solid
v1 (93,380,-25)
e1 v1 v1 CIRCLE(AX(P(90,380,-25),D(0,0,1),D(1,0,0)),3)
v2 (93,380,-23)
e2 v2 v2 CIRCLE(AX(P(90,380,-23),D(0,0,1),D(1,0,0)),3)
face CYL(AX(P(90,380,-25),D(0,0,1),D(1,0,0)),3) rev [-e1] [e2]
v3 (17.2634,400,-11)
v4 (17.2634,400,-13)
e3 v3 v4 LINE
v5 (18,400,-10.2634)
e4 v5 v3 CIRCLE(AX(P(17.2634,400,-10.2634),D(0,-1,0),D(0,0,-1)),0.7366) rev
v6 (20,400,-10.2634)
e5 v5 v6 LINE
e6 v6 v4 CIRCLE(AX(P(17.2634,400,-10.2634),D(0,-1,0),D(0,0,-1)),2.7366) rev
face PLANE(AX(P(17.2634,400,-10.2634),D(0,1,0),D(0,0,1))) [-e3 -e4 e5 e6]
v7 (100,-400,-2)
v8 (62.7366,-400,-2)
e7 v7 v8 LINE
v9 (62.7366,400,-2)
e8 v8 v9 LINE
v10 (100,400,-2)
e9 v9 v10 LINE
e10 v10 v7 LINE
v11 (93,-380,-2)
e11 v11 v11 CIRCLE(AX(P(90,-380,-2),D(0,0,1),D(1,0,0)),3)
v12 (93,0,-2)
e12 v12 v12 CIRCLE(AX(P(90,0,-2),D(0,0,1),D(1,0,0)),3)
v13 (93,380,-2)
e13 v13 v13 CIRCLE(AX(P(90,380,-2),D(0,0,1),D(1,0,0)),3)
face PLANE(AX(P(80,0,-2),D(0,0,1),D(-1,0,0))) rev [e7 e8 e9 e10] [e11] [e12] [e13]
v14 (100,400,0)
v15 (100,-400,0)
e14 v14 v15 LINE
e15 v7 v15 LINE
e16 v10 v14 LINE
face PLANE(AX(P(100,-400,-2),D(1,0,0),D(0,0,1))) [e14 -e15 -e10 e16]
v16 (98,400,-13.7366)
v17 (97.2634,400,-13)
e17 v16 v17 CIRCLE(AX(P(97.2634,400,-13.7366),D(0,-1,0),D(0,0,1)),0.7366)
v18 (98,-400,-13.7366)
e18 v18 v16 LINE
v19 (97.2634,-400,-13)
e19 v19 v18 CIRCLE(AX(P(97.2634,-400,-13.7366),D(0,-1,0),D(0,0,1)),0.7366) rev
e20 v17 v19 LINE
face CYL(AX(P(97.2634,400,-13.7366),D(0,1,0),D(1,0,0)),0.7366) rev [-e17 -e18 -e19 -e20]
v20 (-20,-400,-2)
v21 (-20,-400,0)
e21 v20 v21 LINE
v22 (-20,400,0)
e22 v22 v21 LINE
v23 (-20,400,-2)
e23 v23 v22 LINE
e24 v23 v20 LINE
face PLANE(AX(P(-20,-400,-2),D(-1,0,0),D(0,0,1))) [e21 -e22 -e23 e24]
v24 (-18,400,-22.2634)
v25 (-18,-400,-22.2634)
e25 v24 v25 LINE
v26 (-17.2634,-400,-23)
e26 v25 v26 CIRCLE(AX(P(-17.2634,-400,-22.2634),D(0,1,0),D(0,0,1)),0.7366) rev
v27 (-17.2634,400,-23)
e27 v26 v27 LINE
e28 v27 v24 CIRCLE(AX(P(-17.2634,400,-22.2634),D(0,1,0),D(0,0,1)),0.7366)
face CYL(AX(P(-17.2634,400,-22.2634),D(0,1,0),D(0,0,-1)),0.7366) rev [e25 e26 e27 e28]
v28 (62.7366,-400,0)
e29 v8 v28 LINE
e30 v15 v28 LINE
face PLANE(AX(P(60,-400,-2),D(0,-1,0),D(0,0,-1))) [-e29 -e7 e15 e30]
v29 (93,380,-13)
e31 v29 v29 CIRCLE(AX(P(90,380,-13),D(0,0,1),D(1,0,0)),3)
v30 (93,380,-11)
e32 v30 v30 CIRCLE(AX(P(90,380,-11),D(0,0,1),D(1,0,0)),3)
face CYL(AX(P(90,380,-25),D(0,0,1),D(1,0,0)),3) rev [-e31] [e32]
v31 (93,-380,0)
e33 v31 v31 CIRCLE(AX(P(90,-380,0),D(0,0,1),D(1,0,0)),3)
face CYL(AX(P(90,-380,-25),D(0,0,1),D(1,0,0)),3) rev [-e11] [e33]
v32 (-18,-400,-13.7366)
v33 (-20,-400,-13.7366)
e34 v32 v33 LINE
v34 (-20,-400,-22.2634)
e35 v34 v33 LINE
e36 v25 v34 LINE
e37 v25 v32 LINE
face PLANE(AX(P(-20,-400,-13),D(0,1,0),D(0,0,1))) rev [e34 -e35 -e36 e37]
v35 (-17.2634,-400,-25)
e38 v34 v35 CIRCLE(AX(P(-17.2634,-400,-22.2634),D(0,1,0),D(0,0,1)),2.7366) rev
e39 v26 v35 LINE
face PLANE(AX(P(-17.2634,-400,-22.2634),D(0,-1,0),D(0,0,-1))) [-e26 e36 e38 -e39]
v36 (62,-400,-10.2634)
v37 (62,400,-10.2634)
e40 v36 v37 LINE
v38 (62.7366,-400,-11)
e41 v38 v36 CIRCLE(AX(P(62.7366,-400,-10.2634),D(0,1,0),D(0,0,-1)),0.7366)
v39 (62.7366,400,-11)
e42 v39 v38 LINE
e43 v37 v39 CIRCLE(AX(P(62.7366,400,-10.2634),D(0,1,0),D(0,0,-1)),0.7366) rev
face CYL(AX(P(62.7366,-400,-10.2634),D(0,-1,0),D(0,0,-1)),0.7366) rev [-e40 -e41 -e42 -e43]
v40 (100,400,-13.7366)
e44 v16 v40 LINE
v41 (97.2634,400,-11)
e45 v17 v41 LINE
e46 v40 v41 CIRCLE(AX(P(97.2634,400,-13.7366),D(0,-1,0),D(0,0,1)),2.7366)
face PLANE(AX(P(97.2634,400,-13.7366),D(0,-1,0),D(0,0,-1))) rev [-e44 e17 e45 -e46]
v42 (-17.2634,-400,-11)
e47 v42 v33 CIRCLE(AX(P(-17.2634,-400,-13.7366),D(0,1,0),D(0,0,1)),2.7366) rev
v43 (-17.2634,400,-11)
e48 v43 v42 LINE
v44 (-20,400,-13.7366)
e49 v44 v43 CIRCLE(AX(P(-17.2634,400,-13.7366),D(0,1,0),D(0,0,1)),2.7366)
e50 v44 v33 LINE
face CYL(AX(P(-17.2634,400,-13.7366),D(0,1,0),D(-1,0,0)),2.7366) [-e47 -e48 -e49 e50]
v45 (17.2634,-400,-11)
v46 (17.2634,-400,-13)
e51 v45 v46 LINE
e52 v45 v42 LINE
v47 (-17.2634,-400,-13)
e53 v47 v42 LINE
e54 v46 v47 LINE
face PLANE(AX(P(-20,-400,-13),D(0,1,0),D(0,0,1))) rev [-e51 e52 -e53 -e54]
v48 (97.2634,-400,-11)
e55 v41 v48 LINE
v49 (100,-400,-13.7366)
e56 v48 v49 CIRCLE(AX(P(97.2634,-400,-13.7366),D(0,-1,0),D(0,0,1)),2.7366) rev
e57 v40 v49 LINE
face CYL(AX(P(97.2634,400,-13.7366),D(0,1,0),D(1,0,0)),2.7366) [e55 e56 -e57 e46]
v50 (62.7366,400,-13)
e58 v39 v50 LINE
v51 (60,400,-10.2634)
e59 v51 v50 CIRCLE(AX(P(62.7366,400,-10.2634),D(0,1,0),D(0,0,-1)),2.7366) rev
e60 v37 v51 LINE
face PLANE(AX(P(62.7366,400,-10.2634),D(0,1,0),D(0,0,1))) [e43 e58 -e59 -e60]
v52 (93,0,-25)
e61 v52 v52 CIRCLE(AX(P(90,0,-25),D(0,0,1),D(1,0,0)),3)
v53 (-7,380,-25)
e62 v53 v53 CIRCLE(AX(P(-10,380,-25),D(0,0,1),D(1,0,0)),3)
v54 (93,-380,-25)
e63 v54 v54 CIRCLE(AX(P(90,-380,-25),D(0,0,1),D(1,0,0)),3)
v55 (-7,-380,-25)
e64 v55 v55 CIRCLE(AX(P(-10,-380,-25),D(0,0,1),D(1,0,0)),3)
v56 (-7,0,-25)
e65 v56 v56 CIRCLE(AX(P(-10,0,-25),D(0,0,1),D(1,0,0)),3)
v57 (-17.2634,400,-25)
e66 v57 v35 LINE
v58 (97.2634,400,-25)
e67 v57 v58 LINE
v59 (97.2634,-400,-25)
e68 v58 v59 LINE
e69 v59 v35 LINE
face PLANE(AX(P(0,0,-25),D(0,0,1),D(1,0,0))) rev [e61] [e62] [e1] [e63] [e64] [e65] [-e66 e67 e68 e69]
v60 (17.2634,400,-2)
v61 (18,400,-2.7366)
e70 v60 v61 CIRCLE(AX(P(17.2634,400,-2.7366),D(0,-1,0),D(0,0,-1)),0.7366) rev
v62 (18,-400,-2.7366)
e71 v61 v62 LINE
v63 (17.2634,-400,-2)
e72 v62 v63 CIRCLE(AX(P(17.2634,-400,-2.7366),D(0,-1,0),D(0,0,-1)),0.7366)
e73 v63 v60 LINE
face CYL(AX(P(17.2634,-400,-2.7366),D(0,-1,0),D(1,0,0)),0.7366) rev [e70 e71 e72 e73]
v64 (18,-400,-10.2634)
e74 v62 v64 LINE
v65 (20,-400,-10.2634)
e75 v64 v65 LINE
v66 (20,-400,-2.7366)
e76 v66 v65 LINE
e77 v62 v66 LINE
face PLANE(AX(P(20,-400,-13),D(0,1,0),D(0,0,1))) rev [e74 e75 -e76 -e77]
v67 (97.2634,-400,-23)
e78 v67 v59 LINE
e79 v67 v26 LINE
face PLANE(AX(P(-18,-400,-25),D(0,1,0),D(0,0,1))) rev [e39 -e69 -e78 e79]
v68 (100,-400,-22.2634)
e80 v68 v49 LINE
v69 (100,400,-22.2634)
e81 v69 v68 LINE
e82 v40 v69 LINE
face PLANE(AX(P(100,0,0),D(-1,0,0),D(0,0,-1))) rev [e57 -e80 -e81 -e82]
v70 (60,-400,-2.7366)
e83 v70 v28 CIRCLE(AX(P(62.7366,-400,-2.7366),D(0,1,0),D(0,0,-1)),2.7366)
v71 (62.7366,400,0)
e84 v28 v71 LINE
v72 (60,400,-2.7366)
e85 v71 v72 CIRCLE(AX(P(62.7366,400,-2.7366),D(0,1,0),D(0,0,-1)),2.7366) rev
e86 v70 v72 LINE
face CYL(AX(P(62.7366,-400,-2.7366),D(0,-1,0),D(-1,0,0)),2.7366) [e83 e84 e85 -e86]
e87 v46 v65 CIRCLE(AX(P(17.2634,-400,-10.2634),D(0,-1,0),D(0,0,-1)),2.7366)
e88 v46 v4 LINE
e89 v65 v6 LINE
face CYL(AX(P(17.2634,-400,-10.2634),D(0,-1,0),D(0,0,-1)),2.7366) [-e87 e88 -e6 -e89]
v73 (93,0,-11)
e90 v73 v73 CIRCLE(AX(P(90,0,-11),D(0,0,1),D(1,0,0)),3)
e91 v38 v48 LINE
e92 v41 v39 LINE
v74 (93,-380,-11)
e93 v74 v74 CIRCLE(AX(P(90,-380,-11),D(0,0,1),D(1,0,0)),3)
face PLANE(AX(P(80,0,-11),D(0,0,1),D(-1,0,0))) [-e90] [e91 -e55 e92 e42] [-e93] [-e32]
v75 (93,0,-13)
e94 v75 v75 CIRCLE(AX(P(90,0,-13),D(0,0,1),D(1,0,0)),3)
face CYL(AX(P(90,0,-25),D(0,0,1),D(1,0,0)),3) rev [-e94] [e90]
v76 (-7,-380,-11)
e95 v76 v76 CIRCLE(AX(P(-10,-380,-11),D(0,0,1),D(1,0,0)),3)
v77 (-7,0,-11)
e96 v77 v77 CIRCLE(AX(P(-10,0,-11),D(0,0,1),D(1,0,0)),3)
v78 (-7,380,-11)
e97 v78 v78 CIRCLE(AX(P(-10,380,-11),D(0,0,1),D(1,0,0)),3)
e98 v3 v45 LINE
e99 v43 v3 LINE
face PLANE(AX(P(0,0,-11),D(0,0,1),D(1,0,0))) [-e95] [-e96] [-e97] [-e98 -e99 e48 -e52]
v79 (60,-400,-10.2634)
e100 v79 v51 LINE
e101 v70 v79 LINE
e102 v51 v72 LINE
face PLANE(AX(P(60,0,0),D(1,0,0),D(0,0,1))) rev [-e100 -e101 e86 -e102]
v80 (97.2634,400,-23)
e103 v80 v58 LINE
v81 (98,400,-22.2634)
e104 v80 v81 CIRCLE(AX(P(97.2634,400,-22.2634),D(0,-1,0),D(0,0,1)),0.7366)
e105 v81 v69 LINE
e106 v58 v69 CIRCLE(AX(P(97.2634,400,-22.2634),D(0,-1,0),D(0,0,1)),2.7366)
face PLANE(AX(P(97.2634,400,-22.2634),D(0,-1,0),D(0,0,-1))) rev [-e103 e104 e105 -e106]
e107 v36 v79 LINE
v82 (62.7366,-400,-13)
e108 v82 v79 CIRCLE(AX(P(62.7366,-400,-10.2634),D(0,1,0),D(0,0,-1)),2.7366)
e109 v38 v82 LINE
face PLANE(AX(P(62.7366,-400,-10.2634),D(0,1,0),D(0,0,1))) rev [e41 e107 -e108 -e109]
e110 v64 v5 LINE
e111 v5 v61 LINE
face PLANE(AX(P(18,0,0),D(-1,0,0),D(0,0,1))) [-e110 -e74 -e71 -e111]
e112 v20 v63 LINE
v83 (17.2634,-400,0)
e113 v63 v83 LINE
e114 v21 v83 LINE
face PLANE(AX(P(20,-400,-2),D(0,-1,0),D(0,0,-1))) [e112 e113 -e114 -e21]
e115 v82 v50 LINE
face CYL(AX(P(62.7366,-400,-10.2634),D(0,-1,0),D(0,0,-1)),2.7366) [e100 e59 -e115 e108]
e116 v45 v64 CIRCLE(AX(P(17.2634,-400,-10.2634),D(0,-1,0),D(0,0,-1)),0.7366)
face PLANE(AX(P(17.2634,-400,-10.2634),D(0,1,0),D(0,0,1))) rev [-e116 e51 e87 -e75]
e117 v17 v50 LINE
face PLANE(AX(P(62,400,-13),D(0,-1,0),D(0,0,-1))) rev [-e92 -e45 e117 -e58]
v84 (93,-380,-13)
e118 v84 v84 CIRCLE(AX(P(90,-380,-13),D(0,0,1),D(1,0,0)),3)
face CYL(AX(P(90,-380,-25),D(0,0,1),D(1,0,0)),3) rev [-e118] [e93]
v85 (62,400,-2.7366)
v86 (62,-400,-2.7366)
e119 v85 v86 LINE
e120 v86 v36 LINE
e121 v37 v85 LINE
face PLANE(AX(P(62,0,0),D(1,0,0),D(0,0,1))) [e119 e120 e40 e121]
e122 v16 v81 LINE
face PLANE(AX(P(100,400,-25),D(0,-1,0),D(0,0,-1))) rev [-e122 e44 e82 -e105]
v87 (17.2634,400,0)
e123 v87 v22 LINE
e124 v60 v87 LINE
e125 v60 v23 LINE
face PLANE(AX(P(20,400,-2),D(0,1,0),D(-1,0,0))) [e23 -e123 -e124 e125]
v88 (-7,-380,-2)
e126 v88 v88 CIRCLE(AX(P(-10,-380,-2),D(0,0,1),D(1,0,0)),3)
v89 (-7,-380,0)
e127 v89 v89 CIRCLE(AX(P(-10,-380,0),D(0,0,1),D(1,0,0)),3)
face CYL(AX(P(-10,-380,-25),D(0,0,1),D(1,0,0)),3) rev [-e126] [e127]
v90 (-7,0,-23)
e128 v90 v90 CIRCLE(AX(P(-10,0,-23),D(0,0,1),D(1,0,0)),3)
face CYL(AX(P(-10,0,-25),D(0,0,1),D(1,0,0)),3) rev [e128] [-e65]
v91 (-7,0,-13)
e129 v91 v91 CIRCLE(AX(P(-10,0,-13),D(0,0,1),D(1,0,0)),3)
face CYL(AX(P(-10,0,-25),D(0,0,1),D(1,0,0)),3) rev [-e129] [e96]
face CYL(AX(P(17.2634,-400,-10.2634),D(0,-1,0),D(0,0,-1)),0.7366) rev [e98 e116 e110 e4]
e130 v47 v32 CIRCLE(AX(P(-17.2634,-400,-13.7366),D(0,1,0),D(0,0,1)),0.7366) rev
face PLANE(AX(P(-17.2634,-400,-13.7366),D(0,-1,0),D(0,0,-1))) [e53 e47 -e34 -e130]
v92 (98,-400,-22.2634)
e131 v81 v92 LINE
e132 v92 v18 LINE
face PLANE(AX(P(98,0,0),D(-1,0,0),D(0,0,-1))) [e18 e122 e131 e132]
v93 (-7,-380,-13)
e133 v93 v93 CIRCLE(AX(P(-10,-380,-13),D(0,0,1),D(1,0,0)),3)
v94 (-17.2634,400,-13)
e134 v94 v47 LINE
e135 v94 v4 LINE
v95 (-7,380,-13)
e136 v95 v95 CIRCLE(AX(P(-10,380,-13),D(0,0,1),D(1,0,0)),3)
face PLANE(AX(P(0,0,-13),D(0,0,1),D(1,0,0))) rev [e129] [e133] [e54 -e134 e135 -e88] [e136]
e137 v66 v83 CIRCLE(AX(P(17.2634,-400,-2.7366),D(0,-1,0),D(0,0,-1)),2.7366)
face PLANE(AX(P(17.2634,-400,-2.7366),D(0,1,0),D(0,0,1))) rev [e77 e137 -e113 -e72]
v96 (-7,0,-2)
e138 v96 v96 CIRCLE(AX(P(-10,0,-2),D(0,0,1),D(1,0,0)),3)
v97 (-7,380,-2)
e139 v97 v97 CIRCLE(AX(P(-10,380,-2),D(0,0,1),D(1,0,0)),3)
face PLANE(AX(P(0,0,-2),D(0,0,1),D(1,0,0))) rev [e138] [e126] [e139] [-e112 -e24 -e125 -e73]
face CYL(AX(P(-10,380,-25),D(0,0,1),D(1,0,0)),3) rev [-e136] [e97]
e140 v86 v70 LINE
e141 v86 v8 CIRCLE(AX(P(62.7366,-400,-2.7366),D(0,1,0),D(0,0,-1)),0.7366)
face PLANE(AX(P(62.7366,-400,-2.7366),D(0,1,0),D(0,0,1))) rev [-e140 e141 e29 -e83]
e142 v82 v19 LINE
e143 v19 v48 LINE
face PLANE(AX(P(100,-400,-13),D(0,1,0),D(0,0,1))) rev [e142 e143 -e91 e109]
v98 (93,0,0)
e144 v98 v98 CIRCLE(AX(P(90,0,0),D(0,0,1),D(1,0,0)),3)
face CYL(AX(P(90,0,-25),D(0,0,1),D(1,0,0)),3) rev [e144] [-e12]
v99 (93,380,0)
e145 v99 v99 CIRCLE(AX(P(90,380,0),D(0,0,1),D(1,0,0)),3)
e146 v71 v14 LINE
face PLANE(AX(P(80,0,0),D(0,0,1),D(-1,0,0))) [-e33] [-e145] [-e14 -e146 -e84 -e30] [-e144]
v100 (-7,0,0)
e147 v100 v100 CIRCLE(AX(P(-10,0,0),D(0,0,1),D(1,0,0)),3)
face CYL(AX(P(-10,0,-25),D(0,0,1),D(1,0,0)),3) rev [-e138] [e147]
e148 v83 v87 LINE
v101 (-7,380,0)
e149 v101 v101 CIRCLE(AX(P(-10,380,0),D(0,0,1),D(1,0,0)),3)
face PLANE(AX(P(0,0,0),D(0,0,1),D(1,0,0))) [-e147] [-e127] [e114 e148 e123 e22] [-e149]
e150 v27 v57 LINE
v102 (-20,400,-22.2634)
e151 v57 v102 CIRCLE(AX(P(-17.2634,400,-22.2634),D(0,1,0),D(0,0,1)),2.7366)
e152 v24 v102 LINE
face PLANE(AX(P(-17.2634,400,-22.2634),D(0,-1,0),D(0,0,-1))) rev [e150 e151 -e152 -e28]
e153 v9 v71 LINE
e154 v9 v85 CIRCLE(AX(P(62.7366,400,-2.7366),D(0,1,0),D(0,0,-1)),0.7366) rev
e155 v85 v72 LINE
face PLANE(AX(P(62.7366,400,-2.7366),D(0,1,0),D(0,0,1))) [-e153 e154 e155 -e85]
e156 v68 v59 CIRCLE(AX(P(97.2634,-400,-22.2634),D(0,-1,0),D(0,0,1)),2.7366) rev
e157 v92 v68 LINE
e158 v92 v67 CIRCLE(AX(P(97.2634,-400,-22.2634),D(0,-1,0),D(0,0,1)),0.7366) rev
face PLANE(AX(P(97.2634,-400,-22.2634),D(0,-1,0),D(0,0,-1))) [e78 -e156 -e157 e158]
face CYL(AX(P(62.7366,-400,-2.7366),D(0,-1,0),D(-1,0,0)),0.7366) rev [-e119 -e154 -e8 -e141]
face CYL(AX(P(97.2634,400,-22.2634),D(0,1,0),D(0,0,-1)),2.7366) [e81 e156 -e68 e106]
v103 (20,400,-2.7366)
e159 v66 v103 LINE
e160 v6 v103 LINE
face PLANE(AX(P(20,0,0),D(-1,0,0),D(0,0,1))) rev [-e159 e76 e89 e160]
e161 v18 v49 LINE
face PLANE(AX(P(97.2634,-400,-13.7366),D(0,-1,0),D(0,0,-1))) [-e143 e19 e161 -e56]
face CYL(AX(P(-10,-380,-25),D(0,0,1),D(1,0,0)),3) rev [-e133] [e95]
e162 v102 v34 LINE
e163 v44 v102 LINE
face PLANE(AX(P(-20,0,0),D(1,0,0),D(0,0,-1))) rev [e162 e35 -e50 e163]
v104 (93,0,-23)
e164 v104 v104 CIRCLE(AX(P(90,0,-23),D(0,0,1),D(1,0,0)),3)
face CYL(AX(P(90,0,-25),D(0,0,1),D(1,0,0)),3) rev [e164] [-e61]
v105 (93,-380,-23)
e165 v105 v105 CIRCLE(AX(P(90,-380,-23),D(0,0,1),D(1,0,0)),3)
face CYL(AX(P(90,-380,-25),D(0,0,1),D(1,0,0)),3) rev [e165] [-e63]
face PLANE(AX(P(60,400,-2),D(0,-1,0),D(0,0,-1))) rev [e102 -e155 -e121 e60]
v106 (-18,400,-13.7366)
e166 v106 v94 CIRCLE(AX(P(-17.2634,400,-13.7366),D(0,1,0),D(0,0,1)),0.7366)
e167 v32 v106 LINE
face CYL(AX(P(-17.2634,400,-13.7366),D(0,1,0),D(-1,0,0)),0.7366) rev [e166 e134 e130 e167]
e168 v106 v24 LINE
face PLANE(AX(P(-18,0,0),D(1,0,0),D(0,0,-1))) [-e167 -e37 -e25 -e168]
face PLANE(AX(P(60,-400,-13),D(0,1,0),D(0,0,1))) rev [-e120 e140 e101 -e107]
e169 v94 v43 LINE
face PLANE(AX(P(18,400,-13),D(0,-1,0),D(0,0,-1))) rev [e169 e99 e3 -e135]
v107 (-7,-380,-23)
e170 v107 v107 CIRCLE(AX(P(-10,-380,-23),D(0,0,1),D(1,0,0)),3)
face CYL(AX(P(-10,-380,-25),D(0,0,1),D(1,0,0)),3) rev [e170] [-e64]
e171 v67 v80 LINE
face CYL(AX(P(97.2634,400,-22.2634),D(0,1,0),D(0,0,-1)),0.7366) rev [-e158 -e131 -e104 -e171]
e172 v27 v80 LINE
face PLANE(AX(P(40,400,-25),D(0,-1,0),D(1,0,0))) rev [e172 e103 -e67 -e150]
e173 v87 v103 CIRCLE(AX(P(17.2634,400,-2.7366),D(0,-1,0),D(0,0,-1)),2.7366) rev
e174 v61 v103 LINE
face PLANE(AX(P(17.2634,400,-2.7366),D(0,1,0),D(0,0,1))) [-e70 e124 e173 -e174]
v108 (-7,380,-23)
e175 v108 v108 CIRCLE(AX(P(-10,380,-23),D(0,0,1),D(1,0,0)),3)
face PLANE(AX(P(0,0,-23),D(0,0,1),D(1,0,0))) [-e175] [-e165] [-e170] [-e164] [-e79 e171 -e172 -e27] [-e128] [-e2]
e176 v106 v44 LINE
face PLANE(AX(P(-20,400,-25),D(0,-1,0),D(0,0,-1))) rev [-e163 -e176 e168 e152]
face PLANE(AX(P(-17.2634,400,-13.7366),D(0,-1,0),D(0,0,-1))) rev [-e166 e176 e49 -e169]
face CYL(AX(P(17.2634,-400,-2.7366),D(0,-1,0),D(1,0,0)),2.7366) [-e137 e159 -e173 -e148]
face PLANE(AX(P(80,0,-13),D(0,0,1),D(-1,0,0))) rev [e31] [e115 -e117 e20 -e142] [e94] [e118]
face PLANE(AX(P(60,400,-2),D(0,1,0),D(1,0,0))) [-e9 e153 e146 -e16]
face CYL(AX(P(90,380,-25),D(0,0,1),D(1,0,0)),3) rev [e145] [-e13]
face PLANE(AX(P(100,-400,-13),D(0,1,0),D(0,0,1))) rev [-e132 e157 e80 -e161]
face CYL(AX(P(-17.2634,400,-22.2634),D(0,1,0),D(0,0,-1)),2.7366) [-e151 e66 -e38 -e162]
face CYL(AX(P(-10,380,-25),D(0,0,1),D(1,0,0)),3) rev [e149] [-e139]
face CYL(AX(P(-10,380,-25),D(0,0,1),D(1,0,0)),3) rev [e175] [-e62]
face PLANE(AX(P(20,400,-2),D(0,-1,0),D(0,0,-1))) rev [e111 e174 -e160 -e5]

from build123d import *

# Parameters (mm, degrees)
SKETCH1_W                    = 40
SKETCH1_H                    = 800
BASE_FLANGE1_DEPTH           = 2
EDGE_FLANGE1_STRIP_W         = 9.4732
EDGE_FLANGE1_STRIP_H         = 2
EDGE_FLANGE1_STRIP_CUT_DEPTH = 800
EDGE_FLANGE1_DEPTH           = 800
EDGE_FLANGE2_STRIP_W         = 9.4732
EDGE_FLANGE2_STRIP_H         = 2
EDGE_FLANGE2_STRIP_CUT_DEPTH = 800
EDGE_FLANGE2_DEPTH           = 800
EDGE_FLANGE3_STRIP_W         = 9.4732
EDGE_FLANGE3_STRIP_H         = 2
EDGE_FLANGE3_STRIP_CUT_DEPTH = 800
EDGE_FLANGE3_DEPTH           = 800
EDGE_FLANGE4_STRIP_W         = 9.4732
EDGE_FLANGE4_STRIP_H         = 2
EDGE_FLANGE4_STRIP_CUT_DEPTH = 800
EDGE_FLANGE4_DEPTH           = 800
SKETCH20_R                   = 3
CUT_EXTRUDE1_DEPTH           = 414.067791046


# Sheet-metal steps are written as plain solids
with BuildPart() as part:
    # Sketch1 → Base-Flange1 (new body)
    with BuildSketch(Plane.XY):
        Rectangle(SKETCH1_W, SKETCH1_H)
    extrude(amount=-BASE_FLANGE1_DEPTH)

    # Edge-Flange1 strip (across the edge) → Edge-Flange1 strip cut (cut)
    with BuildSketch(Plane(origin=(20, 400, -2), x_dir=(-1, 0, 0), z_dir=(0, -1, 0))):
        with Locations((-2, -1)):
            Rectangle(EDGE_FLANGE1_STRIP_W, EDGE_FLANGE1_STRIP_H)
    extrude(amount=EDGE_FLANGE1_STRIP_CUT_DEPTH, mode=Mode.SUBTRACT)

    # Edge-Flange1 section (across the edge) → Edge-Flange1 (add)
    with BuildSketch(Plane(origin=(20, 400, -2), x_dir=(-1, 0, 0), z_dir=(0, -1, 0))):
        with BuildLine():
            Line((0, 0.7366), (0, 11))
            Line((0, 11), (2, 11))
            Line((2, 11), (2, 0.7366))
            ThreePointArc((2, 0.7366), (2.215745145, 0.215745145), (2.7366, 0))
            Line((2.7366, 0), (2.7366, -2))
            ThreePointArc((2.7366, -2), (0.801531583, -1.198468417), (0, 0.7366))
        make_face()
    extrude(amount=EDGE_FLANGE1_DEPTH)

    # Edge-Flange2 strip (across the edge) → Edge-Flange2 strip cut (cut)
    with BuildSketch(Plane(origin=(18, 400, -13), x_dir=(0, 0, 1), z_dir=(0, -1, 0))):
        with Locations((-2, -1)):
            Rectangle(EDGE_FLANGE2_STRIP_W, EDGE_FLANGE2_STRIP_H)
    extrude(amount=EDGE_FLANGE2_STRIP_CUT_DEPTH, mode=Mode.SUBTRACT)

    # Edge-Flange2 section (across the edge) → Edge-Flange2 (add)
    with BuildSketch(Plane(origin=(18, 400, -13), x_dir=(0, 0, 1), z_dir=(0, -1, 0))):
        with BuildLine():
            Line((0, 0.7366), (0, 38))
            Line((0, 38), (2, 38))
            Line((2, 38), (2, 0.7366))
            ThreePointArc((2, 0.7366), (2.215745145, 0.215745145), (2.7366, 0))
            Line((2.7366, 0), (2.7366, -2))
            ThreePointArc((2.7366, -2), (0.801531583, -1.198468417), (0, 0.7366))
        make_face()
    extrude(amount=EDGE_FLANGE2_DEPTH)

    # Edge-Flange3 strip (across the edge) → Edge-Flange3 strip cut (cut)
    with BuildSketch(Plane(origin=(-20, -400, -13), x_dir=(1, 0, 0), z_dir=(0, 1, 0))):
        with Locations((-2, -1)):
            Rectangle(EDGE_FLANGE3_STRIP_W, EDGE_FLANGE3_STRIP_H)
    extrude(amount=EDGE_FLANGE3_STRIP_CUT_DEPTH, mode=Mode.SUBTRACT)

    # Edge-Flange3 section (across the edge) → Edge-Flange3 (add)
    with BuildSketch(Plane(origin=(-20, -400, -13), x_dir=(1, 0, 0), z_dir=(0, 1, 0))):
        with BuildLine():
            Line((0, 0.7366), (0, 12))
            Line((0, 12), (2, 12))
            Line((2, 12), (2, 0.7366))
            ThreePointArc((2, 0.7366), (2.215745145, 0.215745145), (2.7366, 0))
            Line((2.7366, 0), (2.7366, -2))
            ThreePointArc((2.7366, -2), (0.801531583, -1.198468417), (0, 0.7366))
        make_face()
    extrude(amount=EDGE_FLANGE3_DEPTH)

    # Edge-Flange4 strip (across the edge) → Edge-Flange4 strip cut (cut)
    with BuildSketch(Plane(origin=(-18, -400, -25), x_dir=(0, 0, 1), z_dir=(0, 1, 0))):
        with Locations((-2, -1)):
            Rectangle(EDGE_FLANGE4_STRIP_W, EDGE_FLANGE4_STRIP_H)
    extrude(amount=EDGE_FLANGE4_STRIP_CUT_DEPTH, mode=Mode.SUBTRACT)

    # Edge-Flange4 section (across the edge) → Edge-Flange4 (add)
    with BuildSketch(Plane(origin=(-18, -400, -25), x_dir=(0, 0, 1), z_dir=(0, 1, 0))):
        with BuildLine():
            Line((0, 0.7366), (0, 58))
            Line((0, 58), (2, 58))
            Line((2, 58), (2, 0.7366))
            ThreePointArc((2, 0.7366), (2.215745145, 0.215745145), (2.7366, 0))
            Line((2.7366, 0), (2.7366, -2))
            ThreePointArc((2.7366, -2), (0.801531583, -1.198468417), (0, 0.7366))
        make_face()
    extrude(amount=EDGE_FLANGE4_DEPTH)

    # Mirror2: part across plane


with BuildPart() as part_1:
    add(part.part)
    add(part.part.mirror(Plane(origin=(40, -400, -25), x_dir=(0, 0, 1), z_dir=(-1, 0, 0))))

    # Sketch20 → Cut-Extrude1 (cut, through all)
    with BuildSketch(Plane.XY):
        with Locations((90, 0)):
            Circle(SKETCH20_R)
        with Locations((90, 380)):
            Circle(SKETCH20_R)
        with Locations((90, -380)):
            Circle(SKETCH20_R)
        with Locations((-10, -380)):
            Circle(SKETCH20_R)
        with Locations((-10, 0)):
            Circle(SKETCH20_R)
        with Locations((-10, 380)):
            Circle(SKETCH20_R)
    extrude(amount=-CUT_EXTRUDE1_DEPTH, mode=Mode.SUBTRACT)


solid = part_1.part
